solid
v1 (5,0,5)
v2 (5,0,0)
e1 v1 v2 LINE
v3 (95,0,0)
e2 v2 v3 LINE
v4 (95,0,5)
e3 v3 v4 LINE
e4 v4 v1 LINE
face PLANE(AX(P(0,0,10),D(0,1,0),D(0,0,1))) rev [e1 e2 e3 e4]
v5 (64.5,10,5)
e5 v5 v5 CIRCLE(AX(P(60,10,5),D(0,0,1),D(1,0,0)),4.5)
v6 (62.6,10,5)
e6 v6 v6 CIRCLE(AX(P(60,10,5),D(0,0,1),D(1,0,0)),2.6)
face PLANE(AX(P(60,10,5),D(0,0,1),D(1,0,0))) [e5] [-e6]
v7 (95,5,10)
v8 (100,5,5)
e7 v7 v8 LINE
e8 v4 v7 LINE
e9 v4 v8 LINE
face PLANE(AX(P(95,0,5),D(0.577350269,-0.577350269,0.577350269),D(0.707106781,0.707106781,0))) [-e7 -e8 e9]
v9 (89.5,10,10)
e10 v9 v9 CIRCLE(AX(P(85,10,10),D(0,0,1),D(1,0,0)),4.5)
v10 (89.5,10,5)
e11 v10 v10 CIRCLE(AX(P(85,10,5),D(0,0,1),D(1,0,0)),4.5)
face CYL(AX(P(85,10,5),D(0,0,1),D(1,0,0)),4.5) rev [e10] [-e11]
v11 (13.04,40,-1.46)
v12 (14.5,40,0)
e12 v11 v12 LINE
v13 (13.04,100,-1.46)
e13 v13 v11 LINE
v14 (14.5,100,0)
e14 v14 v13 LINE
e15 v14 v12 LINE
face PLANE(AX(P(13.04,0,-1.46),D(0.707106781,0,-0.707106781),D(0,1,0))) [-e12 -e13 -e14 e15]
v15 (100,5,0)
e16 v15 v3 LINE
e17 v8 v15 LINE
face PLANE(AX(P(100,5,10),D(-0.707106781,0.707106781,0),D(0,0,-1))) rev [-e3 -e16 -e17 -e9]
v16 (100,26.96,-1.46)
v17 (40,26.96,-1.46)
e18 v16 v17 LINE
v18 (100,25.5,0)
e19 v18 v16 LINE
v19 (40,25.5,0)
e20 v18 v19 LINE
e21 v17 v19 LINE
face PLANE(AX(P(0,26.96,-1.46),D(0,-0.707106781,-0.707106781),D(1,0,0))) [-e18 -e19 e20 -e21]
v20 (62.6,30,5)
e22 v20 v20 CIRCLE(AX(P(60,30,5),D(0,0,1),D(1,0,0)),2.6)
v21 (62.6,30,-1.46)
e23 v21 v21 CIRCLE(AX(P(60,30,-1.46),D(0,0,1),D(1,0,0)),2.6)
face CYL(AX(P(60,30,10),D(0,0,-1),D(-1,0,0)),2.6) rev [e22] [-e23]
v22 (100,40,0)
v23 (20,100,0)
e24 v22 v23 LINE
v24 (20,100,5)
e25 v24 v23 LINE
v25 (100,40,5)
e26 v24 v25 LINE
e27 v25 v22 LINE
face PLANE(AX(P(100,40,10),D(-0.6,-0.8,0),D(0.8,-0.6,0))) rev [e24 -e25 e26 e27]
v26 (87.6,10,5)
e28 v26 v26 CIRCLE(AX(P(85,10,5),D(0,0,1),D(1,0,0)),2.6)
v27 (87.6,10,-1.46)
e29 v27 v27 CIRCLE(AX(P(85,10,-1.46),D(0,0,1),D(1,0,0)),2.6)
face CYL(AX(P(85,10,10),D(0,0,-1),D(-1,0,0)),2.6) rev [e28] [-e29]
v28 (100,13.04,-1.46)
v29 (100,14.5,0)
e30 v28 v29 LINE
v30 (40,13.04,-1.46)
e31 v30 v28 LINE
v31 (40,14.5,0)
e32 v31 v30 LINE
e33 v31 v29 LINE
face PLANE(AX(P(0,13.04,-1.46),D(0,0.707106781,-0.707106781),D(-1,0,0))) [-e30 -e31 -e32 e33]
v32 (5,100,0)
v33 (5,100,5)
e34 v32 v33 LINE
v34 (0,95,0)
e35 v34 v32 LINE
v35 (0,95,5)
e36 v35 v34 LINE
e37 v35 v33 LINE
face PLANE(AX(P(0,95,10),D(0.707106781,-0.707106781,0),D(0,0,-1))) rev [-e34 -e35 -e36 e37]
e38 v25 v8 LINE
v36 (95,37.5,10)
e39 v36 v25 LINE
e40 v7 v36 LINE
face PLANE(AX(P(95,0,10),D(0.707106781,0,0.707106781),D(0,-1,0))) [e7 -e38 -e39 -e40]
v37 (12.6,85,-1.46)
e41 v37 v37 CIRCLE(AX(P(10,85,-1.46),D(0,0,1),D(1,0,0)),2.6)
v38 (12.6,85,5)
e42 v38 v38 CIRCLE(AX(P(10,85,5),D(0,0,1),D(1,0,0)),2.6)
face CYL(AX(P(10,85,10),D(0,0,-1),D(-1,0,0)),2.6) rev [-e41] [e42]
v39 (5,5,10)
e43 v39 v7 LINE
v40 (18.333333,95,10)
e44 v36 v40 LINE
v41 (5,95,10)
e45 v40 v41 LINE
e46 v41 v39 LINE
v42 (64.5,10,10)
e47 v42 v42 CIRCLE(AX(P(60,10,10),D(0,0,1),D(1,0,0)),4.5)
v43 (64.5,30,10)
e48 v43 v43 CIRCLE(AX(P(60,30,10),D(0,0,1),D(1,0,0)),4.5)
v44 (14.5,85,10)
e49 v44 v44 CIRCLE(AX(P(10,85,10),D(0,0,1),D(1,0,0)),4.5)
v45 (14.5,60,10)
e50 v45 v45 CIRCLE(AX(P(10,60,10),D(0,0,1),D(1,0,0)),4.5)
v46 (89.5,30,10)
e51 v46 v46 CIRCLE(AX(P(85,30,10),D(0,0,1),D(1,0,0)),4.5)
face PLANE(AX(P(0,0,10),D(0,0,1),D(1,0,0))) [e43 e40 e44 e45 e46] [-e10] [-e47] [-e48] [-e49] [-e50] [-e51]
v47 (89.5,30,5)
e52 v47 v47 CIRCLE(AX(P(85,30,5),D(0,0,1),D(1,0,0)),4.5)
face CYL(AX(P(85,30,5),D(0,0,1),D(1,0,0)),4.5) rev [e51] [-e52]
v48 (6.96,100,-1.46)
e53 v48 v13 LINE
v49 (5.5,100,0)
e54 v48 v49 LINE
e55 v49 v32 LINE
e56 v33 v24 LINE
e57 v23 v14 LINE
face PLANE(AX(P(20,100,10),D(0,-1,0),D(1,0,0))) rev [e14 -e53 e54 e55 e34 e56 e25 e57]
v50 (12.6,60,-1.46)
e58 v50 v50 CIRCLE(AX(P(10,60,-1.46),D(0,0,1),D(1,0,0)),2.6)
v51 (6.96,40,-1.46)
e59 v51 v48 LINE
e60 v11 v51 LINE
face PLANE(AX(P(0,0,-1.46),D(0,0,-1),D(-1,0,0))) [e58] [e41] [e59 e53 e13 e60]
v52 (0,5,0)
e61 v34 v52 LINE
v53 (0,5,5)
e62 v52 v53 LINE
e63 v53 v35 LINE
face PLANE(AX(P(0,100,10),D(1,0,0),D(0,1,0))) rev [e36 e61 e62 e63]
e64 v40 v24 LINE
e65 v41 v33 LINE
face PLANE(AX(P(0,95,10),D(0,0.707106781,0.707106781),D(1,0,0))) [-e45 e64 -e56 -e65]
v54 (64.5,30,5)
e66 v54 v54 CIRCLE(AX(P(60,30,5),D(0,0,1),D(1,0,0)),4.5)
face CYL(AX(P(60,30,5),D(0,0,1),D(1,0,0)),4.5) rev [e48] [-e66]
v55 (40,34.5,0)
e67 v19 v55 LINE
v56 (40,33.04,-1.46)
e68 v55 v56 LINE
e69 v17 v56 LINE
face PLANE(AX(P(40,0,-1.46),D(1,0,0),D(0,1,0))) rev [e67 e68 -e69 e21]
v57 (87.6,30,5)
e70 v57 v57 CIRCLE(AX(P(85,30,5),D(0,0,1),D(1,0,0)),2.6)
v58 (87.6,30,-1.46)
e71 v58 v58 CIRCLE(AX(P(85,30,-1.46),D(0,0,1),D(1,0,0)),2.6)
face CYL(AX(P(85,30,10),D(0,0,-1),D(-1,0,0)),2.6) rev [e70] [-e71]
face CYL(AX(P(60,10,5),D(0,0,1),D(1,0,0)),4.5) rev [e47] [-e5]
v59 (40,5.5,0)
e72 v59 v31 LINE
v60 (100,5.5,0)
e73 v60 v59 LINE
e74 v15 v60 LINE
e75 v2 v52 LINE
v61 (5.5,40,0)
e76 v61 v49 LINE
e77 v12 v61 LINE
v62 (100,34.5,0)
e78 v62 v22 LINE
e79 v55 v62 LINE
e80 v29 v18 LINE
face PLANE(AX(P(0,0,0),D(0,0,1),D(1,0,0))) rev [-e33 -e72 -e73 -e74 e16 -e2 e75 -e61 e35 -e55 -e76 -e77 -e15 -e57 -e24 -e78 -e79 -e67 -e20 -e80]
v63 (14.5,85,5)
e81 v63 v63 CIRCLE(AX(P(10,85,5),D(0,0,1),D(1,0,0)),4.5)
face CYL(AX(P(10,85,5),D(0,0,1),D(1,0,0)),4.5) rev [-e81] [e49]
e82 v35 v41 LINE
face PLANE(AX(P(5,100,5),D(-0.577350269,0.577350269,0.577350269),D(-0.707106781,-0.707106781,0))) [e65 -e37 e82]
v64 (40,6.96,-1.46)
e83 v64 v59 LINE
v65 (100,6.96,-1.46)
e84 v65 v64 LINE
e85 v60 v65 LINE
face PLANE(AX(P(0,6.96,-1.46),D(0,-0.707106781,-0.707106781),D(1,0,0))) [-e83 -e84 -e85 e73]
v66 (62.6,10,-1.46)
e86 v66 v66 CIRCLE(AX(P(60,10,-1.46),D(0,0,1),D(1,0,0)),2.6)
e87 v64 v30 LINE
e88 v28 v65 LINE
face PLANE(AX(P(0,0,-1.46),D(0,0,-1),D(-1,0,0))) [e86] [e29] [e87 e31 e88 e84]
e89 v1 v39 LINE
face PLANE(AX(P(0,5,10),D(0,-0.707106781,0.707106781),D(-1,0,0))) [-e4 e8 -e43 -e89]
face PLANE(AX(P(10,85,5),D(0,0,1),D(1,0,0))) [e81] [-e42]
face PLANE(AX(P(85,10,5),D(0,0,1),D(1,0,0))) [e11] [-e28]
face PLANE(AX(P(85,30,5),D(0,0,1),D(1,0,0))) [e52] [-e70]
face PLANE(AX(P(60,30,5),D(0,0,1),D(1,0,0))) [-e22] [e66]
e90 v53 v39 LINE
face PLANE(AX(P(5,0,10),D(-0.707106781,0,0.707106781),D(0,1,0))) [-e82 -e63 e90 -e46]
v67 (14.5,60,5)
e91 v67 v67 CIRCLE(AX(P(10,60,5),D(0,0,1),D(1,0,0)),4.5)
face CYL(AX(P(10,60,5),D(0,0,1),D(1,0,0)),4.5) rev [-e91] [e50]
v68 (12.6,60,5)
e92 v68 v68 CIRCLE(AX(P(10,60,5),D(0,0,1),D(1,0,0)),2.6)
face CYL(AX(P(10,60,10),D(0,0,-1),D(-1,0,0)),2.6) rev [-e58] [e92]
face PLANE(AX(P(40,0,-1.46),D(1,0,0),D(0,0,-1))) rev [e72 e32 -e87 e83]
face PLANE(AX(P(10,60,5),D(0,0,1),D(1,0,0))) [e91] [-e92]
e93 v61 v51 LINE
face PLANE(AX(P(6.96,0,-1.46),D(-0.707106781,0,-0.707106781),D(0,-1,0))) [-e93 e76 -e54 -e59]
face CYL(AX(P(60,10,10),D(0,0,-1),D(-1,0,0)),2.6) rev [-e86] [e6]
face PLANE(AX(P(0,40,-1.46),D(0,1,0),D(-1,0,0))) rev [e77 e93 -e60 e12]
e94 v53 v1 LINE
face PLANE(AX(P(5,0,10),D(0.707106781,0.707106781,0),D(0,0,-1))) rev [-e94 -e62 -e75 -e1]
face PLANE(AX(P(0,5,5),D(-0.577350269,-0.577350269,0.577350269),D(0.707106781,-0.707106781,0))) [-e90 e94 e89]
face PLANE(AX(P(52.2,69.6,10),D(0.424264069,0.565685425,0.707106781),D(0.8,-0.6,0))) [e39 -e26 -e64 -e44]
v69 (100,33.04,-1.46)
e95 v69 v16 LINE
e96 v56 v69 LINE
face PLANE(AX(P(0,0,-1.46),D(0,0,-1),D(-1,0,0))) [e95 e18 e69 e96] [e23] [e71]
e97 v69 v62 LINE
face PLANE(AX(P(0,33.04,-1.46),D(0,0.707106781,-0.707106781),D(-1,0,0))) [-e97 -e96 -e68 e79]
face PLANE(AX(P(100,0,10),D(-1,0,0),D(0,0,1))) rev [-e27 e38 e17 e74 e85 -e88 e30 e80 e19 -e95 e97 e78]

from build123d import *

# Parameters (mm, degrees)
BOSS_EXTRUDE1_DEPTH     = 10
SKETCH2_R               = 2.6
CUT_EXTRUDE1_DEPTH      = 142.774468788
SKETCH3_W               = 60
SKETCH3_H               = 9
SKETCH3_W_2             = 9
SKETCH3_H_2             = 60
BOSS_EXTRUDE3_DEPTH     = 1.46
CUT_EXTRUDE2_DEPTH      = 142.774468788
CUT_EXTRUDE2_DEPTH_BACK = 142.774468788
SKETCH2_2_R             = 2.6
CHAMFER1_SIZE           = 1.46
CUT_EXTRUDE3_START      = 10
SKETCH4_R               = 4.5
CUT_EXTRUDE3_DEPTH      = 5
CHAMFER2_SIZE           = 5


with BuildPart() as part:
    # Sketch1 → Boss-Extrude1 (new body)
    with BuildSketch(Plane.XY):
        Polygon((0, 0), (100, 0), (100, 40), (20, 100), (0, 100), align=None)
    extrude(amount=BOSS_EXTRUDE1_DEPTH)

    # Sketch2 → Cut-Extrude1 (cut, through all)
    with BuildSketch(Plane.XY):
        with Locations((10, 85)):
            Circle(SKETCH2_R)
        with Locations((10, 60)):
            Circle(SKETCH2_R)
        with Locations((85, 30)):
            Circle(SKETCH2_R)
        with Locations((85, 10)):
            Circle(SKETCH2_R)
        with Locations((60, 10)):
            Circle(SKETCH2_R)
        with Locations((60, 30)):
            Circle(SKETCH2_R)
    extrude(amount=CUT_EXTRUDE1_DEPTH, mode=Mode.SUBTRACT)

    # Sketch3 → Boss-Extrude3 (add)
    with BuildSketch(Plane.XY):
        with Locations((70, 30)):
            Rectangle(SKETCH3_W, SKETCH3_H)
        with Locations((70, 10)):
            Rectangle(SKETCH3_W, SKETCH3_H)
        with Locations((10, 70)):
            Rectangle(SKETCH3_W_2, SKETCH3_H_2)
    extrude(amount=-BOSS_EXTRUDE3_DEPTH)

    # Sketch2<2> → Cut-Extrude2 (cut, two sides: drawn at the far end of the back side and taken through both)
    with BuildSketch(Plane.XY.offset(-CUT_EXTRUDE2_DEPTH_BACK)):
        with Locations((10, 85)):
            Circle(SKETCH2_2_R)
        with Locations((10, 60)):
            Circle(SKETCH2_2_R)
        with Locations((85, 30)):
            Circle(SKETCH2_2_R)
        with Locations((85, 10)):
            Circle(SKETCH2_2_R)
        with Locations((60, 10)):
            Circle(SKETCH2_2_R)
        with Locations((60, 30)):
            Circle(SKETCH2_2_R)
    extrude(amount=CUT_EXTRUDE2_DEPTH + CUT_EXTRUDE2_DEPTH_BACK, mode=Mode.SUBTRACT)

    # Chamfer1
    chamfer1_edges = [part.edges().sort_by_distance(p)[0] for p in [
        (14.5, 70, -1.46),
        (5.5, 70, -1.46),
        (70, 5.5, -1.46),
        (70, 14.5, -1.46),
        (70, 25.5, -1.46),
        (70, 34.5, -1.46),
    ]]
    chamfer(chamfer1_edges, length=CHAMFER1_SIZE - 0.0001)  # a hair under: the kernel refuses the full size

    # Sketch4 → Cut-Extrude3 (cut)
    with BuildSketch(Plane.XY.offset(CUT_EXTRUDE3_START)):
        with Locations((10, 85)):
            Circle(SKETCH4_R)
        with Locations((10, 60)):
            Circle(SKETCH4_R)
        with Locations((60, 30)):
            Circle(SKETCH4_R)
        with Locations((85, 30)):
            Circle(SKETCH4_R)
        with Locations((85, 10)):
            Circle(SKETCH4_R)
        with Locations((60, 10)):
            Circle(SKETCH4_R)
    extrude(amount=-CUT_EXTRUDE3_DEPTH, mode=Mode.SUBTRACT)

    # Chamfer2
    chamfer2_edges = [part.edges().sort_by_distance(p)[0] for p in [
        (100, 20, 10),
        (60, 70, 10),
        (10, 100, 10),
        (0, 50, 10),
        (50, 0, 10),
        (0, 100, 5),
        (100, 0, 5),
        (0, 0, 5),
    ]]
    chamfer(chamfer2_edges, length=CHAMFER2_SIZE)


solid = part.part
